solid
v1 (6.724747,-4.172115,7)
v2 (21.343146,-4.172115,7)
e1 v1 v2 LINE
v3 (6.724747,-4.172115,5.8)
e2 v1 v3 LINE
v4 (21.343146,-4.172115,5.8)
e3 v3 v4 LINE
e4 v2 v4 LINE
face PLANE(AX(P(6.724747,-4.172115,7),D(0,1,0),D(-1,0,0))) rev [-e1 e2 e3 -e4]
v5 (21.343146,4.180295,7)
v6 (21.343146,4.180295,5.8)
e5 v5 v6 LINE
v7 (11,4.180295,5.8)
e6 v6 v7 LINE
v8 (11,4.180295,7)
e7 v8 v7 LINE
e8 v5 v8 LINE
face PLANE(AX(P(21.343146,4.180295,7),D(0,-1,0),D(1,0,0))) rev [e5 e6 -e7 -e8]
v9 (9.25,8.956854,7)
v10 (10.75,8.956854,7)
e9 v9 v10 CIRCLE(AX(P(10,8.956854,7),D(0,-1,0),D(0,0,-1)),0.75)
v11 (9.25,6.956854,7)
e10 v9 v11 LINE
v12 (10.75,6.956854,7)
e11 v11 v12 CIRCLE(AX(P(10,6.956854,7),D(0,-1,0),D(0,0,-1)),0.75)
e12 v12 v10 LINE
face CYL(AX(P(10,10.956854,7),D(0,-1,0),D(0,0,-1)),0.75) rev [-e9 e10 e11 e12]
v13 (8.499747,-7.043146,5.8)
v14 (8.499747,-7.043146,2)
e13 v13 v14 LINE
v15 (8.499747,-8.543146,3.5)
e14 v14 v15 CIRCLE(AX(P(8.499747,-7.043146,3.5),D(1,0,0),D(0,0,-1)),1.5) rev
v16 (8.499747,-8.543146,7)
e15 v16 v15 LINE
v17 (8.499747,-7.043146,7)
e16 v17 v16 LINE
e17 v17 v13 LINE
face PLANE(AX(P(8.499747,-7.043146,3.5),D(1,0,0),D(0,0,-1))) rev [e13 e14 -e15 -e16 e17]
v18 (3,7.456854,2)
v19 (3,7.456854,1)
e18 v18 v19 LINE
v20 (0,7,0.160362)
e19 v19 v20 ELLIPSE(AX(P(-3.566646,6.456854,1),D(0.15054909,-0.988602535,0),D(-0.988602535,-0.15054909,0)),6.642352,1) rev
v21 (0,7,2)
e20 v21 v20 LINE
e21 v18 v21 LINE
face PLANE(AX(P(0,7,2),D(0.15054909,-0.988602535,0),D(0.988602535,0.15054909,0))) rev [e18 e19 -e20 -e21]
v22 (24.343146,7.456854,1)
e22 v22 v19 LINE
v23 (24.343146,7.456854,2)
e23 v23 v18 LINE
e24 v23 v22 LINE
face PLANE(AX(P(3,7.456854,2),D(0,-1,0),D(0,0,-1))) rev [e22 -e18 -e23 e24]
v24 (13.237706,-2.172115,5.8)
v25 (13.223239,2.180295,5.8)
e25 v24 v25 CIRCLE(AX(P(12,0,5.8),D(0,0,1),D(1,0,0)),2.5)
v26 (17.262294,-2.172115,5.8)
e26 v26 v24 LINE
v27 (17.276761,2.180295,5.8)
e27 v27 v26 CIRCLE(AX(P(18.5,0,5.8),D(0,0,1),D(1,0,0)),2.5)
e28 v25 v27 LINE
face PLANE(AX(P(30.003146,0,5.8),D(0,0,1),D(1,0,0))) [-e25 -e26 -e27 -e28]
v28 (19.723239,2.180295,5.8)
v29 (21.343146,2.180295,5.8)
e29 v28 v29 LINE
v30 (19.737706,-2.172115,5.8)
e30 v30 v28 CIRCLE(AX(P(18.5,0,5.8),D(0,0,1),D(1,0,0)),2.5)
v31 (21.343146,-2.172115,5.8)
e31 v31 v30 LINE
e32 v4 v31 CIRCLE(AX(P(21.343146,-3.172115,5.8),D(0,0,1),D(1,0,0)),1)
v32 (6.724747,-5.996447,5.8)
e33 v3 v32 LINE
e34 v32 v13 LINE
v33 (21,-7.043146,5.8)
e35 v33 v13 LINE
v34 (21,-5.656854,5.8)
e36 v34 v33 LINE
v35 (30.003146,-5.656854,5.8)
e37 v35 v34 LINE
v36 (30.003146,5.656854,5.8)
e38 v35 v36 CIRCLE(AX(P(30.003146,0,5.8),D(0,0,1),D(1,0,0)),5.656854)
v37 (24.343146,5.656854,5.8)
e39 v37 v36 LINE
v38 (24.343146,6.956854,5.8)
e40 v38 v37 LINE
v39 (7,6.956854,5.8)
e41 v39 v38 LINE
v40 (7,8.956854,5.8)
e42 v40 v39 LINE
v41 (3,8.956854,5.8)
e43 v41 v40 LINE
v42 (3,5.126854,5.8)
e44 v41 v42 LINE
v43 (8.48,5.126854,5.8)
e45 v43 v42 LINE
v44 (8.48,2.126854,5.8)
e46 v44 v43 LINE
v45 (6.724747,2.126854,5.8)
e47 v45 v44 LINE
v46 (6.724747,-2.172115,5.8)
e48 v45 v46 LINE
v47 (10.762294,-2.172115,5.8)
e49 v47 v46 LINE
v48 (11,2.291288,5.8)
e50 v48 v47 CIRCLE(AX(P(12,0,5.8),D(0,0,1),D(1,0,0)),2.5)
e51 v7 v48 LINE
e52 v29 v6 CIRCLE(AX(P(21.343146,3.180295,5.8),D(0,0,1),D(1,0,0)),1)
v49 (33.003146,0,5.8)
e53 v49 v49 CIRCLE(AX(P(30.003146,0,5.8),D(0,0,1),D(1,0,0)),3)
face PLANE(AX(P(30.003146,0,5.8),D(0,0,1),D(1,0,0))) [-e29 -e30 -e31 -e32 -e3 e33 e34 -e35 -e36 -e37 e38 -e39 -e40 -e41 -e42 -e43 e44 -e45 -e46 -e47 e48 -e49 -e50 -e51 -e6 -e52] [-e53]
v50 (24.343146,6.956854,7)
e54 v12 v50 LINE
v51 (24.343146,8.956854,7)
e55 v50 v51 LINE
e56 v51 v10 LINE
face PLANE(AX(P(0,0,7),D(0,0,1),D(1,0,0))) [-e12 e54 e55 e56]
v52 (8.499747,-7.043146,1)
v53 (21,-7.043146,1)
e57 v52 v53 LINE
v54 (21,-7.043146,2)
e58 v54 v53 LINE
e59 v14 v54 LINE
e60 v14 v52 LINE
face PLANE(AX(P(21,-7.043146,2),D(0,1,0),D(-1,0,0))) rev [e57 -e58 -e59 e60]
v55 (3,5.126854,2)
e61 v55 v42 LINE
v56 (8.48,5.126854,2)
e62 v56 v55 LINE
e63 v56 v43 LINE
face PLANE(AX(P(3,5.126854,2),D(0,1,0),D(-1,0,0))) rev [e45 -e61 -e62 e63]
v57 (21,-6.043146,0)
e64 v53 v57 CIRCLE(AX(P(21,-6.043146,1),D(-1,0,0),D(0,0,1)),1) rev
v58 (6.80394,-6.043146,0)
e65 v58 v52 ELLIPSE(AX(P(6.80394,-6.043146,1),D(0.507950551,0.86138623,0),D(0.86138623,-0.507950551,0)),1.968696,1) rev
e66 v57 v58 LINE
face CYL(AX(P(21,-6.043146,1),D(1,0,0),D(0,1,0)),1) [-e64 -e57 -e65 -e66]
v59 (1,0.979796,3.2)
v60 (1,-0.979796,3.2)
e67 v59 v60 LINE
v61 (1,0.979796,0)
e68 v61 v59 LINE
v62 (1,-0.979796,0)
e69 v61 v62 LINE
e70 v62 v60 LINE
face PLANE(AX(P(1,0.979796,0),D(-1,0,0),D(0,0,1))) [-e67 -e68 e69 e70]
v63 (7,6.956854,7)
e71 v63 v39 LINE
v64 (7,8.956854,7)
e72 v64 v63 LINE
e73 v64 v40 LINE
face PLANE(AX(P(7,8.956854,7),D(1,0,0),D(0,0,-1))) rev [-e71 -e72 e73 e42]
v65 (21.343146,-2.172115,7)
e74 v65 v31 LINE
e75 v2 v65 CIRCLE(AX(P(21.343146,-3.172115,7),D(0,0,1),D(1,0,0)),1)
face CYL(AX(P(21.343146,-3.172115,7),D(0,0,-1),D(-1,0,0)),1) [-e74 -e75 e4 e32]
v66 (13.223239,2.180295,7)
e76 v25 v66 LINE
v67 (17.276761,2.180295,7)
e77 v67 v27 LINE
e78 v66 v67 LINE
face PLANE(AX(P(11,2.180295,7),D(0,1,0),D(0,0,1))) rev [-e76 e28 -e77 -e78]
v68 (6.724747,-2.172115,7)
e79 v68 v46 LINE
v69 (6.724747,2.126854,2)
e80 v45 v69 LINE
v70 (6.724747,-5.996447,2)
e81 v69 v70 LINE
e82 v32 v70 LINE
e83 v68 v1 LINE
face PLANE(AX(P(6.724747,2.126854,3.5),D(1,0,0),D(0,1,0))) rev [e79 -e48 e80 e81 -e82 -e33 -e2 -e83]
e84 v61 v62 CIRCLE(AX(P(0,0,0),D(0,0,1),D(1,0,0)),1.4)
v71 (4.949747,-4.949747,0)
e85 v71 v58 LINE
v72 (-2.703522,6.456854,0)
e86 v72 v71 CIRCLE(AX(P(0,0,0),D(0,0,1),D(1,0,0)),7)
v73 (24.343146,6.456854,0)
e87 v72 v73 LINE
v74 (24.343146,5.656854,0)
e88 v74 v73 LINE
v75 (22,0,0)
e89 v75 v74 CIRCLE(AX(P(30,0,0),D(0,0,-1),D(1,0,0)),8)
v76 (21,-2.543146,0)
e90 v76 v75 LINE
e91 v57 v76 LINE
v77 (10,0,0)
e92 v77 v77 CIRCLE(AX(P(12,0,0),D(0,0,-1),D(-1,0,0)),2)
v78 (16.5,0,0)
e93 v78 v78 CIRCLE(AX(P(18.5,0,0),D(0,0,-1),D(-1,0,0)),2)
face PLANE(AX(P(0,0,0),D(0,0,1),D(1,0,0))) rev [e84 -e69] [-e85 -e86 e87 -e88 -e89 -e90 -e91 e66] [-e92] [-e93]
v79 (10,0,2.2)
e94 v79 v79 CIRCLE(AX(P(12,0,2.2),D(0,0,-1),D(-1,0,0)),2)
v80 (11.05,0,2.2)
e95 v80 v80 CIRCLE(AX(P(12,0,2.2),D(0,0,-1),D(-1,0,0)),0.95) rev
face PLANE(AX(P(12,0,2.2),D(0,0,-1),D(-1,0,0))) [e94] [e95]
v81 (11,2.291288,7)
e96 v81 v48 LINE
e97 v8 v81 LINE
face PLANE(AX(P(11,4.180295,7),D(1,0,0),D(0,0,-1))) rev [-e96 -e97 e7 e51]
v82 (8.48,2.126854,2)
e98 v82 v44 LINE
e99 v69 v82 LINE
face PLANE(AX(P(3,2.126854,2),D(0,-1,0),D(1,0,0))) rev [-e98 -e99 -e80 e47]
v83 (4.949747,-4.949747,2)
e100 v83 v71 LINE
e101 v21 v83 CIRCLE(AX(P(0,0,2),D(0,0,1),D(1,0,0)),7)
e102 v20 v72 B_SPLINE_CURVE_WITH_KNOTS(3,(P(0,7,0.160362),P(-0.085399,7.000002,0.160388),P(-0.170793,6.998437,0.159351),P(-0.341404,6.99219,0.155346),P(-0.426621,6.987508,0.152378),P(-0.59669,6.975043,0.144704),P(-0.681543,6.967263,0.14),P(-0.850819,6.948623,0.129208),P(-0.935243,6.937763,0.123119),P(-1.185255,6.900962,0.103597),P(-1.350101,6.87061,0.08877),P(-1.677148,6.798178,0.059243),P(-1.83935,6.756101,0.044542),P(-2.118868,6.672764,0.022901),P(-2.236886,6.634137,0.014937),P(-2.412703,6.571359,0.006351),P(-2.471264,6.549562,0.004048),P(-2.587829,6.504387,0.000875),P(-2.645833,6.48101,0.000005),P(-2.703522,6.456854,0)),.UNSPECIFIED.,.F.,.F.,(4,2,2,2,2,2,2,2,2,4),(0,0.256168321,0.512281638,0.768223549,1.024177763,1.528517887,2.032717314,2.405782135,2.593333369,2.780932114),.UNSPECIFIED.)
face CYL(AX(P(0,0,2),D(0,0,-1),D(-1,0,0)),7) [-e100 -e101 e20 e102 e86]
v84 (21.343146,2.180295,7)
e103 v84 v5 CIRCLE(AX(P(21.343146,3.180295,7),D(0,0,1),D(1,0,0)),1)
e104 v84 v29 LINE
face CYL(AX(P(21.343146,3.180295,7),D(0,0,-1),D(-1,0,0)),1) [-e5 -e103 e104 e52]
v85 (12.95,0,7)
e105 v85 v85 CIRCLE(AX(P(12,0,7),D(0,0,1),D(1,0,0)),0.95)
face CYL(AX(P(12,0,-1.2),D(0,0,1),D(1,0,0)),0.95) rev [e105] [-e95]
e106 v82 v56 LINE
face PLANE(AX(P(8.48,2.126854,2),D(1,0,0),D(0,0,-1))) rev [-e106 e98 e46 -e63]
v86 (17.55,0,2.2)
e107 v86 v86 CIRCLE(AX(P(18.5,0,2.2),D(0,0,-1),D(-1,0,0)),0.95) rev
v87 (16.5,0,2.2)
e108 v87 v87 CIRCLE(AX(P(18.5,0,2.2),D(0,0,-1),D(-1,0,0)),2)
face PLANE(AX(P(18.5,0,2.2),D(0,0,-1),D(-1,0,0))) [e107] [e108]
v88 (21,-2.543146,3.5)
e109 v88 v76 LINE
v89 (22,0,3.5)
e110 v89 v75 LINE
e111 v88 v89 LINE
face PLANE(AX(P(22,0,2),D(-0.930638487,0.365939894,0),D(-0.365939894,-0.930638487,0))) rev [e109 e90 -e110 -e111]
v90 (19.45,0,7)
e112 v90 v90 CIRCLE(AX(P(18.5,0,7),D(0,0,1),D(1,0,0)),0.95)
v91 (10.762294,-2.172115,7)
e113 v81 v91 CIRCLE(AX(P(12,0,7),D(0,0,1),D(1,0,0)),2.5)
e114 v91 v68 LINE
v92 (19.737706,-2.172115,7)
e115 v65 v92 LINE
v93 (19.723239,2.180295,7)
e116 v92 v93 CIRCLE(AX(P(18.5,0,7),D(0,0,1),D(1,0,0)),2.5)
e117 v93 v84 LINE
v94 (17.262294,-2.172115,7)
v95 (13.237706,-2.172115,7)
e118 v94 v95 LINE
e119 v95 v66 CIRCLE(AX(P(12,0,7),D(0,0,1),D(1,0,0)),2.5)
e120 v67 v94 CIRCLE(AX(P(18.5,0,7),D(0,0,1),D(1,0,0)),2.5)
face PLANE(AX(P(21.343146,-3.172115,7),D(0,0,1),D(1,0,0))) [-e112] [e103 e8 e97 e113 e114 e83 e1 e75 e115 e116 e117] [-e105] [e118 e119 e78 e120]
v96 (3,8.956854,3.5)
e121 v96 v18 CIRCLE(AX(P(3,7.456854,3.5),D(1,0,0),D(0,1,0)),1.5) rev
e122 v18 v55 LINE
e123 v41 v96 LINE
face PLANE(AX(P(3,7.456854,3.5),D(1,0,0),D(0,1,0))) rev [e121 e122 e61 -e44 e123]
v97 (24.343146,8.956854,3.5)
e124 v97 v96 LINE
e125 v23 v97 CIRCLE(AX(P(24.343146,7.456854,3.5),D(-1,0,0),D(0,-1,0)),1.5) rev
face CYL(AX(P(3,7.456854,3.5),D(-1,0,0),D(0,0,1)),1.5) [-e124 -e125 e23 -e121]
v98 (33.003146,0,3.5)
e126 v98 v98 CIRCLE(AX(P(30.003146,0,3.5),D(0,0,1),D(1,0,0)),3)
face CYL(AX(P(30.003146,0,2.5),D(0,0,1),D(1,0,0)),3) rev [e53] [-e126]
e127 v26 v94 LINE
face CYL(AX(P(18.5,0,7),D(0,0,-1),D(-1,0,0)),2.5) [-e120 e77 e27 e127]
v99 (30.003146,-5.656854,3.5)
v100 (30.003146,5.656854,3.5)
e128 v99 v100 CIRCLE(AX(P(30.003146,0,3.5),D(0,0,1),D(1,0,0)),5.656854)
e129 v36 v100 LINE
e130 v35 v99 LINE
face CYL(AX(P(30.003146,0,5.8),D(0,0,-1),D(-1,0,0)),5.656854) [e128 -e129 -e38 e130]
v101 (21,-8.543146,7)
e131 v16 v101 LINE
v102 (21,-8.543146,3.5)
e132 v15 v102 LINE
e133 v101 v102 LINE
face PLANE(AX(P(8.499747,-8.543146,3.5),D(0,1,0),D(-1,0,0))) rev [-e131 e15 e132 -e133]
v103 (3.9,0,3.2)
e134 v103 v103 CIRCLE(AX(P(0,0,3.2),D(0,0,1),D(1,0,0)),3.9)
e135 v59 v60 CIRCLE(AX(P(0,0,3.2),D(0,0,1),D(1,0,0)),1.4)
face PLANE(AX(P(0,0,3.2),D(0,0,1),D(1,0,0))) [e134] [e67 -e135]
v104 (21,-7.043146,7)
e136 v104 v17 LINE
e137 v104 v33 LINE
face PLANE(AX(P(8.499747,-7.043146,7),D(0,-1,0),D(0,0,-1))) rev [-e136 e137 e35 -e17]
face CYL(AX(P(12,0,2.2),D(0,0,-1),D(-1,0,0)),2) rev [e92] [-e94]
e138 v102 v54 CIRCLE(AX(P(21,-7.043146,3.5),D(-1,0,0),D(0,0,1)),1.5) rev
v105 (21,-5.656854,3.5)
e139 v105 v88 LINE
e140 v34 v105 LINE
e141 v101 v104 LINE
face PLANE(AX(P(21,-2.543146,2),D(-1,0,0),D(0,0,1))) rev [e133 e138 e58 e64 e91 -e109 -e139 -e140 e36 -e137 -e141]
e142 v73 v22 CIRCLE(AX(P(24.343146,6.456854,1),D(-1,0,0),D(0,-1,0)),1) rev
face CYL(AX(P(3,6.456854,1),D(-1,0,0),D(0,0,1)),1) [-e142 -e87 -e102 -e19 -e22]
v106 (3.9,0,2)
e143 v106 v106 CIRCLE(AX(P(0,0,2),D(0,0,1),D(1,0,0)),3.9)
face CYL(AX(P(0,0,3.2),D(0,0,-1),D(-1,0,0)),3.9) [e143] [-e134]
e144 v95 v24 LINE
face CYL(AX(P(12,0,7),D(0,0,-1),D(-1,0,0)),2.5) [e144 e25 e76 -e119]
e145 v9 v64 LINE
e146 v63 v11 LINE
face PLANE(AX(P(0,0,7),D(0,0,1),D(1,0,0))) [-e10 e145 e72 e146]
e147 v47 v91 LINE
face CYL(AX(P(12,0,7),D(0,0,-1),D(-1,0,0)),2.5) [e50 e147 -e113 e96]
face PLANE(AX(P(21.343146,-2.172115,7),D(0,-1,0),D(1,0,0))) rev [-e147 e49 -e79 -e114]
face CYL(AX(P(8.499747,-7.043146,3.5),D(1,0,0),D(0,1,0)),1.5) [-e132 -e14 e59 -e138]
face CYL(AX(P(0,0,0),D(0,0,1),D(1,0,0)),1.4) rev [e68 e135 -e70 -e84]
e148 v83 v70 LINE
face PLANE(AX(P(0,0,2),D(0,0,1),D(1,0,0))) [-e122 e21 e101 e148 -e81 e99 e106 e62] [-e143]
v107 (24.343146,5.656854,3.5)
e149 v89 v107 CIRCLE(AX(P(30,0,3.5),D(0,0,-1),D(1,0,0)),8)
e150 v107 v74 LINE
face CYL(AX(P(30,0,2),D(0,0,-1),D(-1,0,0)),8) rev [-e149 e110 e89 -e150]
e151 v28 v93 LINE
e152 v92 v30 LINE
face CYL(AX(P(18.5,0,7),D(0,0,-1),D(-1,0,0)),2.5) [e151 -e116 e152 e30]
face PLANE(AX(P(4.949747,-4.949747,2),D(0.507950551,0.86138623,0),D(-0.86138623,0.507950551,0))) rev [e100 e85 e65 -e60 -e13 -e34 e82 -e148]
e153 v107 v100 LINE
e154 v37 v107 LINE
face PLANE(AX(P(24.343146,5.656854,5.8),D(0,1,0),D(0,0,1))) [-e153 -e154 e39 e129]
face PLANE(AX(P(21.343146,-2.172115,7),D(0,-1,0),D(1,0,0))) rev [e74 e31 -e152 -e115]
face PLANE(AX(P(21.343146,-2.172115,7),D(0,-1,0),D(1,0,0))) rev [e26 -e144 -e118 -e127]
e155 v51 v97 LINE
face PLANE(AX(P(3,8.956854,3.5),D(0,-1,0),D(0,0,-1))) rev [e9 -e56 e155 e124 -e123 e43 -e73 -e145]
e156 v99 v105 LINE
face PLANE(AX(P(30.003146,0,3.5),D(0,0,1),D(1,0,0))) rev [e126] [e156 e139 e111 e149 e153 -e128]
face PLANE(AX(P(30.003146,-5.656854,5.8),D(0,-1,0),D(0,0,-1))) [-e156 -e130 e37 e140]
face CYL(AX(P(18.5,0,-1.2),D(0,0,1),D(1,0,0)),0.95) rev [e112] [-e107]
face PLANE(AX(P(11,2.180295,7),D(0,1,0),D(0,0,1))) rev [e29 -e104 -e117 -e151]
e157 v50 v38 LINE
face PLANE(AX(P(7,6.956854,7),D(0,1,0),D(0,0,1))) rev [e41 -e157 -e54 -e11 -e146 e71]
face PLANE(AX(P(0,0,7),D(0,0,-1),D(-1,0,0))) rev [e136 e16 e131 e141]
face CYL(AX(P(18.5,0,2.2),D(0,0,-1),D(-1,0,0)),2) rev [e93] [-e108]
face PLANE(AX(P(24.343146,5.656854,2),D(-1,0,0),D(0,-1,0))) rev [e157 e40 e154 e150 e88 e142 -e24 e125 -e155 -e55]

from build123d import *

# Parameters (mm, degrees)
BOSS_EXTRUDE1_DEPTH = 2
BOSS_EXTRUDE2_DEPTH = 1.5
BOSS_EXTRUDE3_DEPTH = 2.3
SKETCH6_W           = 5.48
SKETCH6_H           = 3
CUT_EXTRUDE1_DEPTH  = 3.8
SKETCH7_R           = 3
CUT_EXTRUDE2_DEPTH  = 3.3
SKETCH8_W           = 17.343145751
SKETCH8_H           = 2
SKETCH8_W_2         = 12.500252532
SKETCH8_H_2         = 1.5
BOSS_EXTRUDE4_DEPTH = 1.2
SKETCH9_R           = 2.5
BOSS_EXTRUDE5_DEPTH = 1.2
SKETCH10_R          = 0.95
CUT_EXTRUDE3_DEPTH  = 8.2
SKETCH11_R          = 2
CUT_EXTRUDE4_DEPTH  = 2.2
SKETCH12_R          = 3.9
BOSS_EXTRUDE6_DEPTH = 1.2
CUT_EXTRUDE5_DEPTH  = 3.2
FILLET1_R           = 1.5
FILLET2_R           = 1
SKETCH15_R          = 0.75
CUT_EXTRUDE6_DEPTH  = 4


with BuildPart() as part:
    # Sketch2 → Boss-Extrude1 (new body)
    with BuildSketch(Plane.XY):
        with BuildLine():
            Line((0, 7), (3, 7.456854249))
            Line((3, 7.456854249), (24.343145751, 7.456854249))
            Line((24.343145751, 7.456854249), (24.343145751, 5.656854249))
            ThreePointArc((24.343145751, 5.656854249), (22.60896374, 3.061467459), (22, 0))
            Line((22, 0), (21, -2.543145751))
            Line((21, -2.543145751), (21, -7.043145751))
            Line((21, -7.043145751), (8.499747468, -7.043145751))
            Line((8.499747468, -7.043145751), (4.949747468, -4.949747468))
            ThreePointArc((4.949747468, -4.949747468), (-6.467156728, -2.678784027), (0, 7))
        make_face()
    extrude(amount=BOSS_EXTRUDE1_DEPTH)

    # Sketch3 → Boss-Extrude2 (add)
    with BuildSketch(Plane.XY.offset(2)):
        with BuildLine():
            Line((24.343145751, 7.456854249), (24.343145751, 5.656854249))
            ThreePointArc((24.343145751, 5.656854249), (22.60896374, 3.061467459), (22, 0))
            Line((22, 0), (21, -2.543145751))
            Line((21, -2.543145751), (21, -7.043145751))
            Line((21, -7.043145751), (21, -8.543145751))
            Line((21, -8.543145751), (8.499747468, -8.543145751))
            Line((8.499747468, -8.543145751), (8.499747468, -7.043145751))
            Line((8.499747468, -7.043145751), (6.724747468, -5.996446609))
            Line((6.724747468, -5.996446609), (6.724747468, 2.126854249))
            Line((6.724747468, 2.126854249), (3, 2.126854249))
            Line((3, 2.126854249), (3, 7.456854249))
            Line((3, 7.456854249), (3, 8.956854249))
            Line((3, 8.956854249), (24.343145751, 8.956854249))
            Line((24.343145751, 8.956854249), (24.343145751, 7.456854249))
        make_face()
    extrude(amount=BOSS_EXTRUDE2_DEPTH)

    # Sketch5 → Boss-Extrude3 (add)
    with BuildSketch(Plane.XY.offset(3.5)):
        with BuildLine():
            Line((3, 7.5), (3, 2.126854249))
            Line((3, 2.126854249), (6.724747468, 2.126854249))
            Line((6.724747468, 2.126854249), (6.724747468, -5.996446609))
            Line((6.724747468, -5.996446609), (8.499747468, -7.043145751))
            Line((8.499747468, -7.043145751), (8.499747468, -8.543145751))
            Line((8.499747468, -8.543145751), (21, -8.543145751))
            Line((21, -8.543145751), (21, -5.656854249))
            Line((21, -5.656854249), (30.003145751, -5.656854249))
            ThreePointArc((30.003145751, -5.656854249), (35.66, 0), (30.003145751, 5.656854249))
            Line((30.003145751, 5.656854249), (24.343145751, 5.656854249))
            Line((24.343145751, 5.656854249), (24.343145751, 7.5))
            Line((24.343145751, 7.5), (24.343145751, 8.956854249))
            Line((24.343145751, 8.956854249), (3, 8.956854249))
            Line((3, 8.956854249), (3, 7.5))
        make_face()
    extrude(amount=BOSS_EXTRUDE3_DEPTH)

    # Sketch6 → Cut-Extrude1 (cut)
    with BuildSketch(Plane.XY.offset(5.8)):
        with Locations((5.74, 3.626854249)):
            Rectangle(SKETCH6_W, SKETCH6_H)
    extrude(amount=-CUT_EXTRUDE1_DEPTH, mode=Mode.SUBTRACT)

    # Sketch7 → Cut-Extrude2 (cut)
    with BuildSketch(Plane.XY.offset(5.8)):
        with Locations((30.003145751, 0)):
            Circle(SKETCH7_R)
    extrude(amount=-CUT_EXTRUDE2_DEPTH, mode=Mode.SUBTRACT)

    # Sketch8 → Boss-Extrude4 (add)
    with BuildSketch(Plane.XY.offset(5.8)):
        with Locations((15.671572876, 7.956854249)):
            Rectangle(SKETCH8_W, SKETCH8_H)
        with Locations((14.749873734, -7.793145751)):
            Rectangle(SKETCH8_W_2, SKETCH8_H_2)
        with BuildLine():
            Line((6.724747468, -4.172114809), (21.343145751, -4.172114809))
            ThreePointArc((21.343145751, -4.172114809), (22.343145751, -3.172114809), (21.343145751, -2.172114809))
            Line((21.343145751, -2.172114809), (6.724747468, -2.172114809))
            Line((6.724747468, -2.172114809), (6.724747468, -4.172114809))
        make_face()
        with BuildLine():
            Line((21.343145751, 4.180295218), (11, 4.180295218))
            Line((11, 4.180295218), (11, 2.180295218))
            Line((11, 2.180295218), (21.343145751, 2.180295218))
            ThreePointArc((21.343145751, 2.180295218), (22.343145751, 3.180295218), (21.343145751, 4.180295218))
        make_face()
    extrude(amount=BOSS_EXTRUDE4_DEPTH)

    # Sketch9 → Boss-Extrude5 (add)
    with BuildSketch(Plane.XY.offset(5.8)):
        with Locations((18.5, 0)):
            Circle(SKETCH9_R)
        with Locations((12, 0)):
            Circle(SKETCH9_R)
    extrude(amount=BOSS_EXTRUDE5_DEPTH)

    # Sketch10 → Cut-Extrude3 (cut)
    with BuildSketch(Plane.XY.offset(7)):
        with Locations((18.5, 0)):
            Circle(SKETCH10_R)
        with Locations((12, 0)):
            Circle(SKETCH10_R)
    extrude(amount=-CUT_EXTRUDE3_DEPTH, mode=Mode.SUBTRACT)

    # Sketch11 → Cut-Extrude4 (cut)
    with BuildSketch(Plane(origin=(0, 0, 0), x_dir=(-1, 0, 0), z_dir=(0, 0, -1))):
        with Locations((-12, 0)):
            Circle(SKETCH11_R)
        with Locations((-18.5, 0)):
            Circle(SKETCH11_R)
    extrude(amount=-CUT_EXTRUDE4_DEPTH, mode=Mode.SUBTRACT)

    # Sketch12 → Boss-Extrude6 (add)
    with BuildSketch(Plane.XY.offset(2)):
        Circle(SKETCH12_R)
    extrude(amount=BOSS_EXTRUDE6_DEPTH)

    # Sketch14 → Cut-Extrude5 (cut)
    with BuildSketch(Plane.XY.offset(3.2)):
        with BuildLine():
            Line((1, 0.979795897), (1, -0.979795897))
            ThreePointArc((1, -0.979795897), (-1.4, 0), (1, 0.979795897))
        make_face()
    extrude(amount=-CUT_EXTRUDE5_DEPTH, mode=Mode.SUBTRACT)

    # Fillet1
    fillet1_edges = [part.edges().sort_by_distance(p)[0] for p in [
        (13.671572875, 8.956854249, 2),
        (14.749873734, -8.543145751, 2),
    ]]
    fillet(fillet1_edges, radius=FILLET1_R - 0.0001)  # a hair under: the kernel refuses the full size

    # Fillet2
    fillet2_edges = [part.edges().sort_by_distance(p)[0] for p in [
        (14.749873734, -7.043145751, 0),
        (13.671572875, 7.456854249, 0),
    ]]
    fillet(fillet2_edges, radius=FILLET2_R)

    # Sketch15 → Cut-Extrude6 (cut)
    with BuildSketch(Plane.XZ.offset(-6.956854249)):
        with Locations((10, 7)):
            Circle(SKETCH15_R)
    extrude(amount=-CUT_EXTRUDE6_DEPTH, mode=Mode.SUBTRACT)


solid = part.part
